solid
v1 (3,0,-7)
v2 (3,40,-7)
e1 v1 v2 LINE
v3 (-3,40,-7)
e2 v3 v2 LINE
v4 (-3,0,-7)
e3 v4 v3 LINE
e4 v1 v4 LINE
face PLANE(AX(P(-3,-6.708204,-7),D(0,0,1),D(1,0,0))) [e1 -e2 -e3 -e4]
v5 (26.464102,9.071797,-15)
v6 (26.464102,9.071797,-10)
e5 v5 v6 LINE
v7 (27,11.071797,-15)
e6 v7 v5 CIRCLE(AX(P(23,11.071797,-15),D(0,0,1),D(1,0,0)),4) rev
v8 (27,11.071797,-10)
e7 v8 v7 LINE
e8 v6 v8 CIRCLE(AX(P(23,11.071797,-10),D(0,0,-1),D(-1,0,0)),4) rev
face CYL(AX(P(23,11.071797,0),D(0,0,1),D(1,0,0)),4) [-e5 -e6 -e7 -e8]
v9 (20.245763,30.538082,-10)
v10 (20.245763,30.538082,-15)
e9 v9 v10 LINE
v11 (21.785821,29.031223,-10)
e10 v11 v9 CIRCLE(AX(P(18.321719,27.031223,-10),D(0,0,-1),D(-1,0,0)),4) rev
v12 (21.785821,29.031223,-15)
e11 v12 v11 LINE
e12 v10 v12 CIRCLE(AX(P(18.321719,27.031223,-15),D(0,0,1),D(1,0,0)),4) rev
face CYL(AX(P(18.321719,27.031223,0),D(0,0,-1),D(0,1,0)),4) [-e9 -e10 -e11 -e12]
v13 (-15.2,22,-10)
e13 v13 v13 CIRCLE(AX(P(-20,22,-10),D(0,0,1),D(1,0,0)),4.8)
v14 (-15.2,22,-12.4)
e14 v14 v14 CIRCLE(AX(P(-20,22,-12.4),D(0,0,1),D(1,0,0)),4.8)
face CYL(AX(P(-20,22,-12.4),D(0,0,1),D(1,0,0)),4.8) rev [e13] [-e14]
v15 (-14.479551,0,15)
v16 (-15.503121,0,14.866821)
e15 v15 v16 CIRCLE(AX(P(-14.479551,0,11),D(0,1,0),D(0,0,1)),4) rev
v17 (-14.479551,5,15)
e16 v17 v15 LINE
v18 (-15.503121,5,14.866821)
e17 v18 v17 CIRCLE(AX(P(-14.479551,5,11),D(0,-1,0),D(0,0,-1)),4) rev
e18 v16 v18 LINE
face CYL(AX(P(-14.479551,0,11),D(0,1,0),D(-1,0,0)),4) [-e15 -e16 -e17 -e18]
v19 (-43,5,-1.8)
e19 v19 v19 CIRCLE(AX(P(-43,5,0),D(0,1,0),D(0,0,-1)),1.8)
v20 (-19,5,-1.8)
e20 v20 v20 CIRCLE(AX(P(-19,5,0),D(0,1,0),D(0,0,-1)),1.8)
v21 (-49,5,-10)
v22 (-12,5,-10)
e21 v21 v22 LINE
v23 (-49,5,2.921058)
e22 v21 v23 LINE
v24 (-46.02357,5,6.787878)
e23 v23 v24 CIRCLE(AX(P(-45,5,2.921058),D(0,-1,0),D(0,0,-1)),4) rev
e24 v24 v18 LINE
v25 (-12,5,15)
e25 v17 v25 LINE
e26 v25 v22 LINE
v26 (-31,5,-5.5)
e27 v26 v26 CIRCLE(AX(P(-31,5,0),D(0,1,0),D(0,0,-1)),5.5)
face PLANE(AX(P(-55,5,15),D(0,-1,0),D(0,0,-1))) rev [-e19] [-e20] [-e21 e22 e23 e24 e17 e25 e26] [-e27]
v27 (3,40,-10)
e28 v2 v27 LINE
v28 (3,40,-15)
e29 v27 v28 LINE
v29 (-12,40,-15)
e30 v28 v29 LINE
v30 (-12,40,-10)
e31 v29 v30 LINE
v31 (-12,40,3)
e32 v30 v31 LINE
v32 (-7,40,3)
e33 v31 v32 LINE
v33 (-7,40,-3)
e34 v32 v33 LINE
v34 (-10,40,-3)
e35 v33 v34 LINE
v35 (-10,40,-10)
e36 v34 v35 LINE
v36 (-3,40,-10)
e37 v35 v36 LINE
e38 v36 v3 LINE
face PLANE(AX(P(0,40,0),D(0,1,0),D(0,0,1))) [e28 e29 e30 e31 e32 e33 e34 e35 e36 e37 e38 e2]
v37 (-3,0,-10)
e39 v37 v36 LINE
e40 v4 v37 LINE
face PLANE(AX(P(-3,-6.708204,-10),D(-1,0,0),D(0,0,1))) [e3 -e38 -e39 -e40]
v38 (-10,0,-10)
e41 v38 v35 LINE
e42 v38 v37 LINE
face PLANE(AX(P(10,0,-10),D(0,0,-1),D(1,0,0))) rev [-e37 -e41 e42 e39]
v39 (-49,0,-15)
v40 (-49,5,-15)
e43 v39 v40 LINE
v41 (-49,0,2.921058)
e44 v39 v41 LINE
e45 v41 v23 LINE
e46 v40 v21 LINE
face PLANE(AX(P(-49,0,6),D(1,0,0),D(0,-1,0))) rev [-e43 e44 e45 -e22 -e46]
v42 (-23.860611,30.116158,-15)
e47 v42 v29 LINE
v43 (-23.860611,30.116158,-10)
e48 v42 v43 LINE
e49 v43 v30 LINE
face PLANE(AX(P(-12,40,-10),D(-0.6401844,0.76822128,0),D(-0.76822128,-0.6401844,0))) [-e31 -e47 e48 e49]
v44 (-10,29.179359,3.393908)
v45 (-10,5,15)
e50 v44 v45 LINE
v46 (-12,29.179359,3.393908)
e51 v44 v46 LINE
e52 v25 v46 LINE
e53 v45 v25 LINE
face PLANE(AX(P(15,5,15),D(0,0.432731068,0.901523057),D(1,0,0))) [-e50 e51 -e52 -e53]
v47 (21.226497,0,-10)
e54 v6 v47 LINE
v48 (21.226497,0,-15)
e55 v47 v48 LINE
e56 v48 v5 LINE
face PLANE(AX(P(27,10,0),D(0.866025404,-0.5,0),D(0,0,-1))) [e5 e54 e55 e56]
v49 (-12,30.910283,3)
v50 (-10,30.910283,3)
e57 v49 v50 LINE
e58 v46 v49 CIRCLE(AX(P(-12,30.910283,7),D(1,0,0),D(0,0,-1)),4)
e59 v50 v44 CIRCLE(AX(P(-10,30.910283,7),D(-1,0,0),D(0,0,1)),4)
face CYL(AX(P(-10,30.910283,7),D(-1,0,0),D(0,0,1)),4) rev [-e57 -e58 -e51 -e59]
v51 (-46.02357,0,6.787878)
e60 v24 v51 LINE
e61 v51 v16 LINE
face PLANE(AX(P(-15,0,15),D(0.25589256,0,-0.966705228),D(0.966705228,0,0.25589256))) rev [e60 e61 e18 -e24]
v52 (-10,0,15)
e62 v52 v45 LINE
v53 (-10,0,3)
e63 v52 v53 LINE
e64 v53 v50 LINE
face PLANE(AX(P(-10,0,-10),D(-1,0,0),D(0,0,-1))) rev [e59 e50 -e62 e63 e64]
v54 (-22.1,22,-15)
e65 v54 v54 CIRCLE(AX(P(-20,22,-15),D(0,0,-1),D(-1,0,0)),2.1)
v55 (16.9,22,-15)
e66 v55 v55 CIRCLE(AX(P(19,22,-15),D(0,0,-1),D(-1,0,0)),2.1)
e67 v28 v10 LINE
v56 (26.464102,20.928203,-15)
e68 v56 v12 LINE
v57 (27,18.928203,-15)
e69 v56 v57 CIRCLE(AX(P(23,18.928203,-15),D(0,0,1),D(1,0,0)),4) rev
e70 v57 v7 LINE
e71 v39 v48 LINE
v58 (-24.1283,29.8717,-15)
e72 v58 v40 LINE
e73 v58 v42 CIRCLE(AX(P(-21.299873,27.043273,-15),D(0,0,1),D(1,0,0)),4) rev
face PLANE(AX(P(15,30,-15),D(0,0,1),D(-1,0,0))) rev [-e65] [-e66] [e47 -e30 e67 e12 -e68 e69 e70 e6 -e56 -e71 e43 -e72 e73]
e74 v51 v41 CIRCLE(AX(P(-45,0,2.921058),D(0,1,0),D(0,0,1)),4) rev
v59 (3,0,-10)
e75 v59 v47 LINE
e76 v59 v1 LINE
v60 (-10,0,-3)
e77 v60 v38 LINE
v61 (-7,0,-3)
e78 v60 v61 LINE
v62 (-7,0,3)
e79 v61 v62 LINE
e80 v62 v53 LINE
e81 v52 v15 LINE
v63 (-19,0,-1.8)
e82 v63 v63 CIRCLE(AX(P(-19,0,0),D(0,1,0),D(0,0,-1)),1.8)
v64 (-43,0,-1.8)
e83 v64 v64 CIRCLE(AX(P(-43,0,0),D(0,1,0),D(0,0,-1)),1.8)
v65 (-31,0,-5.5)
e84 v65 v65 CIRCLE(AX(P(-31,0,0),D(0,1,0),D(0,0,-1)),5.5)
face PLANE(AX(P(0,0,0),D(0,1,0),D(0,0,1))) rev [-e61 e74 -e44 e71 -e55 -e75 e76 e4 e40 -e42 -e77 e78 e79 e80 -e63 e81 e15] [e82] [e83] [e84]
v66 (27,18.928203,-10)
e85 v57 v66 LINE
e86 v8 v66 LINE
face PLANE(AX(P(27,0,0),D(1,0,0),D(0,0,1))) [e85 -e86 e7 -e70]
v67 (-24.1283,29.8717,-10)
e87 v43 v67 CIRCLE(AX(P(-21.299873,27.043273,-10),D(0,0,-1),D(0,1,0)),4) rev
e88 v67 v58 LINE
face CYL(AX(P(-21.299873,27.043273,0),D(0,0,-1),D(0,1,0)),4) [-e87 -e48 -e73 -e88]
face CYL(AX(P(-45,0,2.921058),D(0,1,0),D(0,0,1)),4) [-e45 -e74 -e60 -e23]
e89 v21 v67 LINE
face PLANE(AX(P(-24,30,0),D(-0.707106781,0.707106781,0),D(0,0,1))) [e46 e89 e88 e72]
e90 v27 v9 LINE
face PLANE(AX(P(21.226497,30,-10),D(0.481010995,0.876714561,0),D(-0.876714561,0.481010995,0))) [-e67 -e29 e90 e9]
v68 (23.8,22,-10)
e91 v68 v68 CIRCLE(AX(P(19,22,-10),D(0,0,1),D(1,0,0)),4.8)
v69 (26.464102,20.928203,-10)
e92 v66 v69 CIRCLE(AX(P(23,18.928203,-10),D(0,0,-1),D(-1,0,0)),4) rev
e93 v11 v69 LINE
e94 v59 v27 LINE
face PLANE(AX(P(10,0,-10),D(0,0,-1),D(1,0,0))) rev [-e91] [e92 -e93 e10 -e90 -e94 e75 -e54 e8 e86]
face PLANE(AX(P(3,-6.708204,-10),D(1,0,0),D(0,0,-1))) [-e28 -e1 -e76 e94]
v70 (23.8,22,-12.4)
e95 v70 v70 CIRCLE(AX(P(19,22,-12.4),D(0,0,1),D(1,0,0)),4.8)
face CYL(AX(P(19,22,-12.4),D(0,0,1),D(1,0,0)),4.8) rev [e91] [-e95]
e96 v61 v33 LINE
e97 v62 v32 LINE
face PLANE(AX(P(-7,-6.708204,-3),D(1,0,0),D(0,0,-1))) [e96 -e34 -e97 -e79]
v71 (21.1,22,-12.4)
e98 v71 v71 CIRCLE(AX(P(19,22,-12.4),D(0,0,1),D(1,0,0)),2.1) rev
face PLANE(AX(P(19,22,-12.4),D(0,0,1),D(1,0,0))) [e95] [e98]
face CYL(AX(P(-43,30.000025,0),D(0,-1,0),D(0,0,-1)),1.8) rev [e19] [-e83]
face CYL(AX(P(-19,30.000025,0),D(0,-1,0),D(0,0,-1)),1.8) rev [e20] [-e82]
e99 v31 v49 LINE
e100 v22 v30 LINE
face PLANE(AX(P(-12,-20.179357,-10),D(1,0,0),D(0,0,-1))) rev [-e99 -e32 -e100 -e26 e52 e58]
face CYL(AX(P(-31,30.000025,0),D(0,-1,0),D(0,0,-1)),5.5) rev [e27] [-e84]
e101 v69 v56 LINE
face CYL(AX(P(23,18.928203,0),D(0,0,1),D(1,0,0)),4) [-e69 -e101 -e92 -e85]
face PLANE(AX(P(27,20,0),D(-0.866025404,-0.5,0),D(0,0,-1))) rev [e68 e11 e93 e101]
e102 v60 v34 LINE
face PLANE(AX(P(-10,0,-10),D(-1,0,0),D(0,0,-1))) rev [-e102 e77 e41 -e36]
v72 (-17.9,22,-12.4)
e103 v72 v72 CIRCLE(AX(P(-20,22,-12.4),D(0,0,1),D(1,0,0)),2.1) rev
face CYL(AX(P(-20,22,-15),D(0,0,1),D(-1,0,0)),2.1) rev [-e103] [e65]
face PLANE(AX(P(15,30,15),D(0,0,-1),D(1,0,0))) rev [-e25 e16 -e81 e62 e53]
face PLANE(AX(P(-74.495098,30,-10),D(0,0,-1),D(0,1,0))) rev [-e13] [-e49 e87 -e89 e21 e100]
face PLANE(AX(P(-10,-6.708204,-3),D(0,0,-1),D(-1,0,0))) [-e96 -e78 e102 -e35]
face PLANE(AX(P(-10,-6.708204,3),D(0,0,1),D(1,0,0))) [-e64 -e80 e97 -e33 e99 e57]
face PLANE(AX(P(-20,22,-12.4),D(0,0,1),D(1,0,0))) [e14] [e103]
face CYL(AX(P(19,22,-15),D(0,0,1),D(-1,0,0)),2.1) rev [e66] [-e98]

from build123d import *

# Parameters (mm, degrees)
SKETCH1_W                     = 30
SKETCH1_H                     = 30
BOSS_EXTRUDE1_DEPTH           = 30
SKETCH2_W                     = 20
SKETCH2_H                     = 20
CUT_EXTRUDE1_DEPTH            = 37.742346142
SKETCH3_W                     = 30
SKETCH3_H                     = 5
BOSS_EXTRUDE2_DEPTH           = 40
SKETCH4_R                     = 5.5
SKETCH4_R_2                   = 1.8
CUT_EXTRUDE2_DEPTH            = 65.420493634
CUT_EXTRUDE3_DEPTH            = 63.24949799
SKETCH5_W                     = 5
SKETCH5_H                     = 25
BOSS_EXTRUDE4_DEPTH           = 34
CHAMFER1_SIZE                 = 25
SKETCH8_R                     = 2.1
CUT_EXTRUDE4_DEPTH            = 63.657800791
SKETCH9_W                     = 5
SKETCH9_H                     = 30
BOSS_EXTRUDE5_DEPTH           = 12
CHAMFER2_SIZE                 = 10
CHAMFER2_SIZE2                = 5.773502692
SKETCH10_R                    = 2.1
CUT_EXTRUDE5_DEPTH            = 63.657800791
BODY_MOVE_COPY1_START         = -15
BODY_MOVE_COPY1_DEPTH         = 31
BODY_MOVE_COPY1_START_2       = -10
BODY_MOVE_COPY1_2_DEPTH       = 26
BODY_MOVE_COPY1_3_OUTLINE_W   = 34
BODY_MOVE_COPY1_3_OUTLINE_H   = 5
BODY_MOVE_COPY1_3_DEPTH       = 30
BODY_MOVE_COPY1_4_DEPTH       = 5
BODY_MOVE_COPY1_5_OUTLINE_R   = 5.5
BODY_MOVE_COPY1_5_OUTLINE_R_2 = 1.8
BODY_MOVE_COPY1_5_DEPTH       = 5
SKETCH11_W                    = 3
SKETCH11_H                    = 25
CUT_EXTRUDE6_DEPTH            = 25
SKETCH12_W                    = 25
SKETCH12_H                    = 25
CUT_EXTRUDE7_DEPTH            = 60.380131357
SKETCH13_W                    = 3
SKETCH13_H                    = 6
SKETCH13_W_2                  = 6
SKETCH13_H_2                  = 3
BOSS_EXTRUDE6_DEPTH           = 30
SKETCH14_R                    = 4.8
CUT_EXTRUDE9_DEPTH            = 2.4
CHAMFER3_SIZE                 = 12
CHAMFER3_SIZE2                = 25
FILLET1_R                     = 4
BOSS_EXTRUDE7_DEPTH           = 10
BOSS_EXTRUDE8_DEPTH           = 5
FILLET3_R                     = 4
FILLET4_R                     = 4


with BuildPart() as part:
    # Sketch1 → Boss-Extrude1 (new body)
    with BuildSketch(Plane(origin=(0, 0, 0), x_dir=(1, 0, 0), z_dir=(0, 1, 0))):
        Rectangle(SKETCH1_W, SKETCH1_H)
    extrude(amount=BOSS_EXTRUDE1_DEPTH)

    # Sketch2 → Cut-Extrude1 (cut, through all)
    with BuildSketch(Plane(origin=(0, 30, 0), x_dir=(1, 0, 0), z_dir=(0, 1, 0))):
        Rectangle(SKETCH2_W, SKETCH2_H)
    extrude(amount=-CUT_EXTRUDE1_DEPTH, mode=Mode.SUBTRACT)

    # Sketch3 → Boss-Extrude2 (add)
    with BuildSketch(Plane(origin=(15, 0, 0), x_dir=(0, 0, -1), z_dir=(1, 0, 0))):
        with Locations((0, 2.5)):
            Rectangle(SKETCH3_W, SKETCH3_H)
    extrude(amount=BOSS_EXTRUDE2_DEPTH)

    # Sketch4 → Cut-Extrude2 (cut, through all)
    with BuildSketch(Plane.XZ):
        with Locations(Location((31, 0, 0), (0, 0, 270))):
            Circle(SKETCH4_R)
        with Locations(Location((19, 0, 0), (0, 0, 270))):
            Circle(SKETCH4_R_2)
        with Locations(Location((43, 0, 0), (0, 0, 270))):
            Circle(SKETCH4_R_2)
    extrude(amount=-CUT_EXTRUDE2_DEPTH, mode=Mode.SUBTRACT)

    # Sketch7 → Cut-Extrude3 (cut, through all)
    with BuildSketch(Plane(origin=(0, 5, 0), x_dir=(1, 0, 0), z_dir=(0, 1, 0))):
        Polygon((15, -15), (49, -6), (49, 15), (55, 15), (55, -15), align=None)
    extrude(amount=-CUT_EXTRUDE3_DEPTH, mode=Mode.SUBTRACT)

    # Sketch5 → Boss-Extrude4 (add)
    with BuildSketch(Plane(origin=(15, 0, 0), x_dir=(0, 0, -1), z_dir=(1, 0, 0))):
        with Locations((12.5, 17.5)):
            Rectangle(SKETCH5_W, SKETCH5_H)
    extrude(amount=BOSS_EXTRUDE4_DEPTH)

    # Chamfer1
    chamfer1_edges = [part.edges().sort_by_distance(p)[0] for p in [
        (49, 30, -12.5),
    ]]
    chamfer(chamfer1_edges, length=CHAMFER1_SIZE)

    # Sketch8 → Cut-Extrude4 (cut, through all)
    with BuildSketch(Plane.XY.offset(-10)):
        with Locations((20, 22)):
            Circle(SKETCH8_R)
    extrude(amount=-CUT_EXTRUDE4_DEPTH, mode=Mode.SUBTRACT)

    # Sketch9 → Boss-Extrude5 (add)
    with BuildSketch(Plane.ZY.offset(15)):
        with Locations((-12.5, 15)):
            Rectangle(SKETCH9_W, SKETCH9_H)
    extrude(amount=BOSS_EXTRUDE5_DEPTH)

    # Chamfer2
    chamfer2_edges = [part.edges().sort_by_distance(p)[0] for p in [
        (-27, 30, -12.5),
        (-27, 0, -12.5),
    ]]
    chamfer2_side = [part.faces().sort_by_distance(p)[0] for p in [
        (-27, 15, -12.5),
    ]]
    chamfer(chamfer2_edges, length=CHAMFER2_SIZE, length2=CHAMFER2_SIZE2, reference=chamfer2_side[0])

    # Sketch10 → Cut-Extrude5 (cut, through all)
    with BuildSketch(Plane.XY.offset(-10)):
        with Locations((-19, 22)):
            Circle(SKETCH10_R)
    extrude(amount=-CUT_EXTRUDE5_DEPTH, mode=Mode.SUBTRACT)

    # Body-Move/Copy1: read off the stored shape, not the designer's step
    # Body-Move/Copy1 outline → Body-Move/Copy1 (cut)
    with BuildSketch(Plane.XY.offset(BODY_MOVE_COPY1_START)):
        Polygon((24, 30), (21.226497308, 30), (27, 20), (27, 10), (21.226497308, 0), (49, 0), (49, 5), align=None)
        with BuildLine():
            ThreePointArc((-19.5, 19.960392195), (-21.1, 22), (-19.5, 24.039607805))
            ThreePointArc((-19.5, 24.039607805), (-22.1, 22), (-19.5, 19.960392195))
        make_face()
        with BuildLine():
            ThreePointArc((19.5, 19.960392195), (17.9, 22), (19.5, 24.039607805))
            ThreePointArc((19.5, 24.039607805), (16.9, 22), (19.5, 19.960392195))
        make_face()
    extrude(amount=BODY_MOVE_COPY1_DEPTH, mode=Mode.SUBTRACT)

    # Body-Move_Copy1 2 outline → Body-Move_Copy1 2 (cut)
    with BuildSketch(Plane.XY.offset(BODY_MOVE_COPY1_START_2)):
        Polygon((24.113248654, 5), (15, 5), (15, 0), (21.226497308, 0), align=None)
    extrude(amount=BODY_MOVE_COPY1_2_DEPTH, mode=Mode.SUBTRACT)

    # Body-Move_Copy1 3 outline → Body-Move_Copy1 3 (add)
    with BuildSketch(Plane.XY.offset(BODY_MOVE_COPY1_START)):
        with Locations((-32, 2.5)):
            Rectangle(BODY_MOVE_COPY1_3_OUTLINE_W, BODY_MOVE_COPY1_3_OUTLINE_H)
    extrude(amount=BODY_MOVE_COPY1_3_DEPTH)

    # Body-Move_Copy1 4 outline → Body-Move_Copy1 4 (add)
    with BuildSketch(Plane.XY.offset(BODY_MOVE_COPY1_START)):
        Polygon((-27, 20), (-21.226497308, 30), (-24, 30), (-49, 5), (-24.113248654, 5), (-27, 10), align=None)
        with BuildLine():
            ThreePointArc((-19.5, 24.039607805), (-17.9, 22), (-19.5, 19.960392195))
            ThreePointArc((-19.5, 19.960392195), (-16.9, 22), (-19.5, 24.039607805))
        make_face()
        with BuildLine():
            ThreePointArc((19.5, 24.039607805), (21.1, 22), (19.5, 19.960392195))
            ThreePointArc((19.5, 19.960392195), (22.1, 22), (19.5, 24.039607805))
        make_face()
    extrude(amount=BODY_MOVE_COPY1_4_DEPTH)

    # Body-Move_Copy1 5 outline → Body-Move_Copy1 5 (cut)
    with BuildSketch(Plane(origin=(0, 0, 0), x_dir=(1, 0, 0), z_dir=(0, 1, 0))):
        with Locations((-31, 0)):
            Circle(BODY_MOVE_COPY1_5_OUTLINE_R)
        with Locations((-19, 0)):
            Circle(BODY_MOVE_COPY1_5_OUTLINE_R_2)
        with Locations((-43, 0)):
            Circle(BODY_MOVE_COPY1_5_OUTLINE_R_2)
        Polygon((-49, -15), (-15, -15), (-49, -6), align=None)
    extrude(amount=BODY_MOVE_COPY1_5_DEPTH, mode=Mode.SUBTRACT)

    # Sketch11 → Cut-Extrude6 (cut)
    with BuildSketch(Plane(origin=(0, 30, 0), x_dir=(1, 0, 0), z_dir=(0, 1, 0))):
        with Locations((-13.5, -2.5)):
            Rectangle(SKETCH11_W, SKETCH11_H)
    extrude(amount=-CUT_EXTRUDE6_DEPTH, mode=Mode.SUBTRACT)

    # Sketch12 → Cut-Extrude7 (cut, through all)
    with BuildSketch(Plane(origin=(0, 30, 0), x_dir=(1, 0, 0), z_dir=(0, 1, 0))):
        with Locations((2.5, -2.5)):
            Rectangle(SKETCH12_W, SKETCH12_H)
    extrude(amount=-CUT_EXTRUDE7_DEPTH, mode=Mode.SUBTRACT)

    # Sketch13 → Boss-Extrude6 (add)
    with BuildSketch(Plane(origin=(0, 30, 0), x_dir=(1, 0, 0), z_dir=(0, 1, 0))):
        with Locations((-8.5, 0)):
            Rectangle(SKETCH13_W, SKETCH13_H)
        with Locations((0, 8.5)):
            Rectangle(SKETCH13_W_2, SKETCH13_H_2)
    extrude(amount=-BOSS_EXTRUDE6_DEPTH)

    # Sketch14 → Cut-Extrude9 (cut)
    with BuildSketch(Plane.XY.offset(-10)):
        with Locations((-20, 22)):
            Circle(SKETCH14_R)
        with Locations((19, 22)):
            Circle(SKETCH14_R)
    extrude(amount=-CUT_EXTRUDE9_DEPTH, mode=Mode.SUBTRACT)

    # Chamfer3
    chamfer3_edges = [part.edges().sort_by_distance(p)[0] for p in [
        (-11, 30, 15),
    ]]
    chamfer3_side = [part.faces().sort_by_distance(p)[0] for p in [
        (-18, 30, -10.542718717),
    ]]
    chamfer(chamfer3_edges, length=CHAMFER3_SIZE, length2=CHAMFER3_SIZE2, reference=chamfer3_side[0])

    # Fillet1
    fillet1_edges = [part.edges().sort_by_distance(p)[0] for p in [
        (-49, 2.5, 6),
        (-15, 2.5, 15),
    ]]
    fillet(fillet1_edges, radius=FILLET1_R)

    # Sketch16 → Boss-Extrude7 (add)
    with BuildSketch(Plane(origin=(0, 30, 0), x_dir=(1, 0, 0), z_dir=(0, 1, 0))):
        Polygon((-12, -3), (-7, -3), (-7, 3), (-10, 3), (-10, 10), (-3, 10), (-3, 7), (3, 7), (3, 15), (-12, 15), align=None)
    extrude(amount=BOSS_EXTRUDE7_DEPTH)

    # Sketch17 → Boss-Extrude8 (add)
    with BuildSketch(Plane(origin=(0, 0, -15), x_dir=(-1, 0, 0), z_dir=(0, 0, -1))):
        Polygon((-21.226497308, 30), (-3, 40), (-3, 30), align=None)
        Polygon((12, 30), (12, 40), (24, 30), align=None)
    extrude(amount=-BOSS_EXTRUDE8_DEPTH)

    # Fillet3
    fillet3_edges = [part.edges().sort_by_distance(p)[0] for p in [
        (-11, 30, 3),
    ]]
    fillet(fillet3_edges, radius=FILLET3_R)

    # Fillet4
    # the kernel refuses this fillet: 4 mm, written as the material it takes off along each edge
    with BuildSketch(Plane(origin=(27, 10, -17.679491924), x_dir=(-0.500000000006737, -0.8660254037805489, 0), z_dir=(0, 0, 1))) as fillet4_piece_1:
        with BuildLine():
            CenterArc((FILLET4_R * 0.267949192435, -FILLET4_R), FILLET4_R, 90, 30)
            Line((-FILLET4_R * 0.232050807571, -FILLET4_R * 0.133974596219), (0, 0))
            Line((0, 0), (FILLET4_R * 0.267949192435, 0))
        make_face()
    extrude(amount=10.358983849, mode=Mode.SUBTRACT)
    with BuildSketch(Plane(origin=(27, 20, -17.679491924), x_dir=(-0.5000000000067392, 0.8660254037805477, 0), z_dir=(0, 0, 1))) as fillet4_piece_2:
        with BuildLine():
            CenterArc((FILLET4_R * 0.267949192435, FILLET4_R), FILLET4_R, 240, 30)
            Line((-FILLET4_R * 0.232050807571, FILLET4_R * 0.133974596219), (0, 0))
            Line((0, 0), (FILLET4_R * 0.267949192435, 0))
        make_face()
    extrude(amount=10.358983849, mode=Mode.SUBTRACT)
    with BuildSketch(Plane(origin=(21.226497308, 30, -17.796617535), x_dir=(0.5000000000067387, -0.8660254037805479, 0), z_dir=(0, 0, 1))) as fillet4_piece_3:
        with BuildLine():
            CenterArc((FILLET4_R * 0.27966175346, -FILLET4_R), FILLET4_R, 90, 31.248547441)
            Line((-FILLET4_R * 0.23908983086, -FILLET4_R * 0.145074977694), (0, 0))
            Line((0, 0), (FILLET4_R * 0.27966175346, 0))
        make_face()
    extrude(amount=10.59323507, mode=Mode.SUBTRACT)
    with BuildSketch(Plane(origin=(-24, 30, -15.453610172), x_dir=(0.7682212795973823, 0.6401843996644723, 0), z_dir=(0, 0, 1))) as fillet4_piece_4:
        with BuildLine():
            CenterArc((FILLET4_R * 0.0453610171873, -FILLET4_R), FILLET4_R, 90, 5.194428908)
            Line((-FILLET4_R * 0.0451747288553, -FILLET4_R * 0.0041067935323), (0, 0))
            Line((0, 0), (FILLET4_R * 0.0453610171873, 0))
        make_face()
    extrude(amount=5.907220344, mode=Mode.SUBTRACT)


solid = part.part
